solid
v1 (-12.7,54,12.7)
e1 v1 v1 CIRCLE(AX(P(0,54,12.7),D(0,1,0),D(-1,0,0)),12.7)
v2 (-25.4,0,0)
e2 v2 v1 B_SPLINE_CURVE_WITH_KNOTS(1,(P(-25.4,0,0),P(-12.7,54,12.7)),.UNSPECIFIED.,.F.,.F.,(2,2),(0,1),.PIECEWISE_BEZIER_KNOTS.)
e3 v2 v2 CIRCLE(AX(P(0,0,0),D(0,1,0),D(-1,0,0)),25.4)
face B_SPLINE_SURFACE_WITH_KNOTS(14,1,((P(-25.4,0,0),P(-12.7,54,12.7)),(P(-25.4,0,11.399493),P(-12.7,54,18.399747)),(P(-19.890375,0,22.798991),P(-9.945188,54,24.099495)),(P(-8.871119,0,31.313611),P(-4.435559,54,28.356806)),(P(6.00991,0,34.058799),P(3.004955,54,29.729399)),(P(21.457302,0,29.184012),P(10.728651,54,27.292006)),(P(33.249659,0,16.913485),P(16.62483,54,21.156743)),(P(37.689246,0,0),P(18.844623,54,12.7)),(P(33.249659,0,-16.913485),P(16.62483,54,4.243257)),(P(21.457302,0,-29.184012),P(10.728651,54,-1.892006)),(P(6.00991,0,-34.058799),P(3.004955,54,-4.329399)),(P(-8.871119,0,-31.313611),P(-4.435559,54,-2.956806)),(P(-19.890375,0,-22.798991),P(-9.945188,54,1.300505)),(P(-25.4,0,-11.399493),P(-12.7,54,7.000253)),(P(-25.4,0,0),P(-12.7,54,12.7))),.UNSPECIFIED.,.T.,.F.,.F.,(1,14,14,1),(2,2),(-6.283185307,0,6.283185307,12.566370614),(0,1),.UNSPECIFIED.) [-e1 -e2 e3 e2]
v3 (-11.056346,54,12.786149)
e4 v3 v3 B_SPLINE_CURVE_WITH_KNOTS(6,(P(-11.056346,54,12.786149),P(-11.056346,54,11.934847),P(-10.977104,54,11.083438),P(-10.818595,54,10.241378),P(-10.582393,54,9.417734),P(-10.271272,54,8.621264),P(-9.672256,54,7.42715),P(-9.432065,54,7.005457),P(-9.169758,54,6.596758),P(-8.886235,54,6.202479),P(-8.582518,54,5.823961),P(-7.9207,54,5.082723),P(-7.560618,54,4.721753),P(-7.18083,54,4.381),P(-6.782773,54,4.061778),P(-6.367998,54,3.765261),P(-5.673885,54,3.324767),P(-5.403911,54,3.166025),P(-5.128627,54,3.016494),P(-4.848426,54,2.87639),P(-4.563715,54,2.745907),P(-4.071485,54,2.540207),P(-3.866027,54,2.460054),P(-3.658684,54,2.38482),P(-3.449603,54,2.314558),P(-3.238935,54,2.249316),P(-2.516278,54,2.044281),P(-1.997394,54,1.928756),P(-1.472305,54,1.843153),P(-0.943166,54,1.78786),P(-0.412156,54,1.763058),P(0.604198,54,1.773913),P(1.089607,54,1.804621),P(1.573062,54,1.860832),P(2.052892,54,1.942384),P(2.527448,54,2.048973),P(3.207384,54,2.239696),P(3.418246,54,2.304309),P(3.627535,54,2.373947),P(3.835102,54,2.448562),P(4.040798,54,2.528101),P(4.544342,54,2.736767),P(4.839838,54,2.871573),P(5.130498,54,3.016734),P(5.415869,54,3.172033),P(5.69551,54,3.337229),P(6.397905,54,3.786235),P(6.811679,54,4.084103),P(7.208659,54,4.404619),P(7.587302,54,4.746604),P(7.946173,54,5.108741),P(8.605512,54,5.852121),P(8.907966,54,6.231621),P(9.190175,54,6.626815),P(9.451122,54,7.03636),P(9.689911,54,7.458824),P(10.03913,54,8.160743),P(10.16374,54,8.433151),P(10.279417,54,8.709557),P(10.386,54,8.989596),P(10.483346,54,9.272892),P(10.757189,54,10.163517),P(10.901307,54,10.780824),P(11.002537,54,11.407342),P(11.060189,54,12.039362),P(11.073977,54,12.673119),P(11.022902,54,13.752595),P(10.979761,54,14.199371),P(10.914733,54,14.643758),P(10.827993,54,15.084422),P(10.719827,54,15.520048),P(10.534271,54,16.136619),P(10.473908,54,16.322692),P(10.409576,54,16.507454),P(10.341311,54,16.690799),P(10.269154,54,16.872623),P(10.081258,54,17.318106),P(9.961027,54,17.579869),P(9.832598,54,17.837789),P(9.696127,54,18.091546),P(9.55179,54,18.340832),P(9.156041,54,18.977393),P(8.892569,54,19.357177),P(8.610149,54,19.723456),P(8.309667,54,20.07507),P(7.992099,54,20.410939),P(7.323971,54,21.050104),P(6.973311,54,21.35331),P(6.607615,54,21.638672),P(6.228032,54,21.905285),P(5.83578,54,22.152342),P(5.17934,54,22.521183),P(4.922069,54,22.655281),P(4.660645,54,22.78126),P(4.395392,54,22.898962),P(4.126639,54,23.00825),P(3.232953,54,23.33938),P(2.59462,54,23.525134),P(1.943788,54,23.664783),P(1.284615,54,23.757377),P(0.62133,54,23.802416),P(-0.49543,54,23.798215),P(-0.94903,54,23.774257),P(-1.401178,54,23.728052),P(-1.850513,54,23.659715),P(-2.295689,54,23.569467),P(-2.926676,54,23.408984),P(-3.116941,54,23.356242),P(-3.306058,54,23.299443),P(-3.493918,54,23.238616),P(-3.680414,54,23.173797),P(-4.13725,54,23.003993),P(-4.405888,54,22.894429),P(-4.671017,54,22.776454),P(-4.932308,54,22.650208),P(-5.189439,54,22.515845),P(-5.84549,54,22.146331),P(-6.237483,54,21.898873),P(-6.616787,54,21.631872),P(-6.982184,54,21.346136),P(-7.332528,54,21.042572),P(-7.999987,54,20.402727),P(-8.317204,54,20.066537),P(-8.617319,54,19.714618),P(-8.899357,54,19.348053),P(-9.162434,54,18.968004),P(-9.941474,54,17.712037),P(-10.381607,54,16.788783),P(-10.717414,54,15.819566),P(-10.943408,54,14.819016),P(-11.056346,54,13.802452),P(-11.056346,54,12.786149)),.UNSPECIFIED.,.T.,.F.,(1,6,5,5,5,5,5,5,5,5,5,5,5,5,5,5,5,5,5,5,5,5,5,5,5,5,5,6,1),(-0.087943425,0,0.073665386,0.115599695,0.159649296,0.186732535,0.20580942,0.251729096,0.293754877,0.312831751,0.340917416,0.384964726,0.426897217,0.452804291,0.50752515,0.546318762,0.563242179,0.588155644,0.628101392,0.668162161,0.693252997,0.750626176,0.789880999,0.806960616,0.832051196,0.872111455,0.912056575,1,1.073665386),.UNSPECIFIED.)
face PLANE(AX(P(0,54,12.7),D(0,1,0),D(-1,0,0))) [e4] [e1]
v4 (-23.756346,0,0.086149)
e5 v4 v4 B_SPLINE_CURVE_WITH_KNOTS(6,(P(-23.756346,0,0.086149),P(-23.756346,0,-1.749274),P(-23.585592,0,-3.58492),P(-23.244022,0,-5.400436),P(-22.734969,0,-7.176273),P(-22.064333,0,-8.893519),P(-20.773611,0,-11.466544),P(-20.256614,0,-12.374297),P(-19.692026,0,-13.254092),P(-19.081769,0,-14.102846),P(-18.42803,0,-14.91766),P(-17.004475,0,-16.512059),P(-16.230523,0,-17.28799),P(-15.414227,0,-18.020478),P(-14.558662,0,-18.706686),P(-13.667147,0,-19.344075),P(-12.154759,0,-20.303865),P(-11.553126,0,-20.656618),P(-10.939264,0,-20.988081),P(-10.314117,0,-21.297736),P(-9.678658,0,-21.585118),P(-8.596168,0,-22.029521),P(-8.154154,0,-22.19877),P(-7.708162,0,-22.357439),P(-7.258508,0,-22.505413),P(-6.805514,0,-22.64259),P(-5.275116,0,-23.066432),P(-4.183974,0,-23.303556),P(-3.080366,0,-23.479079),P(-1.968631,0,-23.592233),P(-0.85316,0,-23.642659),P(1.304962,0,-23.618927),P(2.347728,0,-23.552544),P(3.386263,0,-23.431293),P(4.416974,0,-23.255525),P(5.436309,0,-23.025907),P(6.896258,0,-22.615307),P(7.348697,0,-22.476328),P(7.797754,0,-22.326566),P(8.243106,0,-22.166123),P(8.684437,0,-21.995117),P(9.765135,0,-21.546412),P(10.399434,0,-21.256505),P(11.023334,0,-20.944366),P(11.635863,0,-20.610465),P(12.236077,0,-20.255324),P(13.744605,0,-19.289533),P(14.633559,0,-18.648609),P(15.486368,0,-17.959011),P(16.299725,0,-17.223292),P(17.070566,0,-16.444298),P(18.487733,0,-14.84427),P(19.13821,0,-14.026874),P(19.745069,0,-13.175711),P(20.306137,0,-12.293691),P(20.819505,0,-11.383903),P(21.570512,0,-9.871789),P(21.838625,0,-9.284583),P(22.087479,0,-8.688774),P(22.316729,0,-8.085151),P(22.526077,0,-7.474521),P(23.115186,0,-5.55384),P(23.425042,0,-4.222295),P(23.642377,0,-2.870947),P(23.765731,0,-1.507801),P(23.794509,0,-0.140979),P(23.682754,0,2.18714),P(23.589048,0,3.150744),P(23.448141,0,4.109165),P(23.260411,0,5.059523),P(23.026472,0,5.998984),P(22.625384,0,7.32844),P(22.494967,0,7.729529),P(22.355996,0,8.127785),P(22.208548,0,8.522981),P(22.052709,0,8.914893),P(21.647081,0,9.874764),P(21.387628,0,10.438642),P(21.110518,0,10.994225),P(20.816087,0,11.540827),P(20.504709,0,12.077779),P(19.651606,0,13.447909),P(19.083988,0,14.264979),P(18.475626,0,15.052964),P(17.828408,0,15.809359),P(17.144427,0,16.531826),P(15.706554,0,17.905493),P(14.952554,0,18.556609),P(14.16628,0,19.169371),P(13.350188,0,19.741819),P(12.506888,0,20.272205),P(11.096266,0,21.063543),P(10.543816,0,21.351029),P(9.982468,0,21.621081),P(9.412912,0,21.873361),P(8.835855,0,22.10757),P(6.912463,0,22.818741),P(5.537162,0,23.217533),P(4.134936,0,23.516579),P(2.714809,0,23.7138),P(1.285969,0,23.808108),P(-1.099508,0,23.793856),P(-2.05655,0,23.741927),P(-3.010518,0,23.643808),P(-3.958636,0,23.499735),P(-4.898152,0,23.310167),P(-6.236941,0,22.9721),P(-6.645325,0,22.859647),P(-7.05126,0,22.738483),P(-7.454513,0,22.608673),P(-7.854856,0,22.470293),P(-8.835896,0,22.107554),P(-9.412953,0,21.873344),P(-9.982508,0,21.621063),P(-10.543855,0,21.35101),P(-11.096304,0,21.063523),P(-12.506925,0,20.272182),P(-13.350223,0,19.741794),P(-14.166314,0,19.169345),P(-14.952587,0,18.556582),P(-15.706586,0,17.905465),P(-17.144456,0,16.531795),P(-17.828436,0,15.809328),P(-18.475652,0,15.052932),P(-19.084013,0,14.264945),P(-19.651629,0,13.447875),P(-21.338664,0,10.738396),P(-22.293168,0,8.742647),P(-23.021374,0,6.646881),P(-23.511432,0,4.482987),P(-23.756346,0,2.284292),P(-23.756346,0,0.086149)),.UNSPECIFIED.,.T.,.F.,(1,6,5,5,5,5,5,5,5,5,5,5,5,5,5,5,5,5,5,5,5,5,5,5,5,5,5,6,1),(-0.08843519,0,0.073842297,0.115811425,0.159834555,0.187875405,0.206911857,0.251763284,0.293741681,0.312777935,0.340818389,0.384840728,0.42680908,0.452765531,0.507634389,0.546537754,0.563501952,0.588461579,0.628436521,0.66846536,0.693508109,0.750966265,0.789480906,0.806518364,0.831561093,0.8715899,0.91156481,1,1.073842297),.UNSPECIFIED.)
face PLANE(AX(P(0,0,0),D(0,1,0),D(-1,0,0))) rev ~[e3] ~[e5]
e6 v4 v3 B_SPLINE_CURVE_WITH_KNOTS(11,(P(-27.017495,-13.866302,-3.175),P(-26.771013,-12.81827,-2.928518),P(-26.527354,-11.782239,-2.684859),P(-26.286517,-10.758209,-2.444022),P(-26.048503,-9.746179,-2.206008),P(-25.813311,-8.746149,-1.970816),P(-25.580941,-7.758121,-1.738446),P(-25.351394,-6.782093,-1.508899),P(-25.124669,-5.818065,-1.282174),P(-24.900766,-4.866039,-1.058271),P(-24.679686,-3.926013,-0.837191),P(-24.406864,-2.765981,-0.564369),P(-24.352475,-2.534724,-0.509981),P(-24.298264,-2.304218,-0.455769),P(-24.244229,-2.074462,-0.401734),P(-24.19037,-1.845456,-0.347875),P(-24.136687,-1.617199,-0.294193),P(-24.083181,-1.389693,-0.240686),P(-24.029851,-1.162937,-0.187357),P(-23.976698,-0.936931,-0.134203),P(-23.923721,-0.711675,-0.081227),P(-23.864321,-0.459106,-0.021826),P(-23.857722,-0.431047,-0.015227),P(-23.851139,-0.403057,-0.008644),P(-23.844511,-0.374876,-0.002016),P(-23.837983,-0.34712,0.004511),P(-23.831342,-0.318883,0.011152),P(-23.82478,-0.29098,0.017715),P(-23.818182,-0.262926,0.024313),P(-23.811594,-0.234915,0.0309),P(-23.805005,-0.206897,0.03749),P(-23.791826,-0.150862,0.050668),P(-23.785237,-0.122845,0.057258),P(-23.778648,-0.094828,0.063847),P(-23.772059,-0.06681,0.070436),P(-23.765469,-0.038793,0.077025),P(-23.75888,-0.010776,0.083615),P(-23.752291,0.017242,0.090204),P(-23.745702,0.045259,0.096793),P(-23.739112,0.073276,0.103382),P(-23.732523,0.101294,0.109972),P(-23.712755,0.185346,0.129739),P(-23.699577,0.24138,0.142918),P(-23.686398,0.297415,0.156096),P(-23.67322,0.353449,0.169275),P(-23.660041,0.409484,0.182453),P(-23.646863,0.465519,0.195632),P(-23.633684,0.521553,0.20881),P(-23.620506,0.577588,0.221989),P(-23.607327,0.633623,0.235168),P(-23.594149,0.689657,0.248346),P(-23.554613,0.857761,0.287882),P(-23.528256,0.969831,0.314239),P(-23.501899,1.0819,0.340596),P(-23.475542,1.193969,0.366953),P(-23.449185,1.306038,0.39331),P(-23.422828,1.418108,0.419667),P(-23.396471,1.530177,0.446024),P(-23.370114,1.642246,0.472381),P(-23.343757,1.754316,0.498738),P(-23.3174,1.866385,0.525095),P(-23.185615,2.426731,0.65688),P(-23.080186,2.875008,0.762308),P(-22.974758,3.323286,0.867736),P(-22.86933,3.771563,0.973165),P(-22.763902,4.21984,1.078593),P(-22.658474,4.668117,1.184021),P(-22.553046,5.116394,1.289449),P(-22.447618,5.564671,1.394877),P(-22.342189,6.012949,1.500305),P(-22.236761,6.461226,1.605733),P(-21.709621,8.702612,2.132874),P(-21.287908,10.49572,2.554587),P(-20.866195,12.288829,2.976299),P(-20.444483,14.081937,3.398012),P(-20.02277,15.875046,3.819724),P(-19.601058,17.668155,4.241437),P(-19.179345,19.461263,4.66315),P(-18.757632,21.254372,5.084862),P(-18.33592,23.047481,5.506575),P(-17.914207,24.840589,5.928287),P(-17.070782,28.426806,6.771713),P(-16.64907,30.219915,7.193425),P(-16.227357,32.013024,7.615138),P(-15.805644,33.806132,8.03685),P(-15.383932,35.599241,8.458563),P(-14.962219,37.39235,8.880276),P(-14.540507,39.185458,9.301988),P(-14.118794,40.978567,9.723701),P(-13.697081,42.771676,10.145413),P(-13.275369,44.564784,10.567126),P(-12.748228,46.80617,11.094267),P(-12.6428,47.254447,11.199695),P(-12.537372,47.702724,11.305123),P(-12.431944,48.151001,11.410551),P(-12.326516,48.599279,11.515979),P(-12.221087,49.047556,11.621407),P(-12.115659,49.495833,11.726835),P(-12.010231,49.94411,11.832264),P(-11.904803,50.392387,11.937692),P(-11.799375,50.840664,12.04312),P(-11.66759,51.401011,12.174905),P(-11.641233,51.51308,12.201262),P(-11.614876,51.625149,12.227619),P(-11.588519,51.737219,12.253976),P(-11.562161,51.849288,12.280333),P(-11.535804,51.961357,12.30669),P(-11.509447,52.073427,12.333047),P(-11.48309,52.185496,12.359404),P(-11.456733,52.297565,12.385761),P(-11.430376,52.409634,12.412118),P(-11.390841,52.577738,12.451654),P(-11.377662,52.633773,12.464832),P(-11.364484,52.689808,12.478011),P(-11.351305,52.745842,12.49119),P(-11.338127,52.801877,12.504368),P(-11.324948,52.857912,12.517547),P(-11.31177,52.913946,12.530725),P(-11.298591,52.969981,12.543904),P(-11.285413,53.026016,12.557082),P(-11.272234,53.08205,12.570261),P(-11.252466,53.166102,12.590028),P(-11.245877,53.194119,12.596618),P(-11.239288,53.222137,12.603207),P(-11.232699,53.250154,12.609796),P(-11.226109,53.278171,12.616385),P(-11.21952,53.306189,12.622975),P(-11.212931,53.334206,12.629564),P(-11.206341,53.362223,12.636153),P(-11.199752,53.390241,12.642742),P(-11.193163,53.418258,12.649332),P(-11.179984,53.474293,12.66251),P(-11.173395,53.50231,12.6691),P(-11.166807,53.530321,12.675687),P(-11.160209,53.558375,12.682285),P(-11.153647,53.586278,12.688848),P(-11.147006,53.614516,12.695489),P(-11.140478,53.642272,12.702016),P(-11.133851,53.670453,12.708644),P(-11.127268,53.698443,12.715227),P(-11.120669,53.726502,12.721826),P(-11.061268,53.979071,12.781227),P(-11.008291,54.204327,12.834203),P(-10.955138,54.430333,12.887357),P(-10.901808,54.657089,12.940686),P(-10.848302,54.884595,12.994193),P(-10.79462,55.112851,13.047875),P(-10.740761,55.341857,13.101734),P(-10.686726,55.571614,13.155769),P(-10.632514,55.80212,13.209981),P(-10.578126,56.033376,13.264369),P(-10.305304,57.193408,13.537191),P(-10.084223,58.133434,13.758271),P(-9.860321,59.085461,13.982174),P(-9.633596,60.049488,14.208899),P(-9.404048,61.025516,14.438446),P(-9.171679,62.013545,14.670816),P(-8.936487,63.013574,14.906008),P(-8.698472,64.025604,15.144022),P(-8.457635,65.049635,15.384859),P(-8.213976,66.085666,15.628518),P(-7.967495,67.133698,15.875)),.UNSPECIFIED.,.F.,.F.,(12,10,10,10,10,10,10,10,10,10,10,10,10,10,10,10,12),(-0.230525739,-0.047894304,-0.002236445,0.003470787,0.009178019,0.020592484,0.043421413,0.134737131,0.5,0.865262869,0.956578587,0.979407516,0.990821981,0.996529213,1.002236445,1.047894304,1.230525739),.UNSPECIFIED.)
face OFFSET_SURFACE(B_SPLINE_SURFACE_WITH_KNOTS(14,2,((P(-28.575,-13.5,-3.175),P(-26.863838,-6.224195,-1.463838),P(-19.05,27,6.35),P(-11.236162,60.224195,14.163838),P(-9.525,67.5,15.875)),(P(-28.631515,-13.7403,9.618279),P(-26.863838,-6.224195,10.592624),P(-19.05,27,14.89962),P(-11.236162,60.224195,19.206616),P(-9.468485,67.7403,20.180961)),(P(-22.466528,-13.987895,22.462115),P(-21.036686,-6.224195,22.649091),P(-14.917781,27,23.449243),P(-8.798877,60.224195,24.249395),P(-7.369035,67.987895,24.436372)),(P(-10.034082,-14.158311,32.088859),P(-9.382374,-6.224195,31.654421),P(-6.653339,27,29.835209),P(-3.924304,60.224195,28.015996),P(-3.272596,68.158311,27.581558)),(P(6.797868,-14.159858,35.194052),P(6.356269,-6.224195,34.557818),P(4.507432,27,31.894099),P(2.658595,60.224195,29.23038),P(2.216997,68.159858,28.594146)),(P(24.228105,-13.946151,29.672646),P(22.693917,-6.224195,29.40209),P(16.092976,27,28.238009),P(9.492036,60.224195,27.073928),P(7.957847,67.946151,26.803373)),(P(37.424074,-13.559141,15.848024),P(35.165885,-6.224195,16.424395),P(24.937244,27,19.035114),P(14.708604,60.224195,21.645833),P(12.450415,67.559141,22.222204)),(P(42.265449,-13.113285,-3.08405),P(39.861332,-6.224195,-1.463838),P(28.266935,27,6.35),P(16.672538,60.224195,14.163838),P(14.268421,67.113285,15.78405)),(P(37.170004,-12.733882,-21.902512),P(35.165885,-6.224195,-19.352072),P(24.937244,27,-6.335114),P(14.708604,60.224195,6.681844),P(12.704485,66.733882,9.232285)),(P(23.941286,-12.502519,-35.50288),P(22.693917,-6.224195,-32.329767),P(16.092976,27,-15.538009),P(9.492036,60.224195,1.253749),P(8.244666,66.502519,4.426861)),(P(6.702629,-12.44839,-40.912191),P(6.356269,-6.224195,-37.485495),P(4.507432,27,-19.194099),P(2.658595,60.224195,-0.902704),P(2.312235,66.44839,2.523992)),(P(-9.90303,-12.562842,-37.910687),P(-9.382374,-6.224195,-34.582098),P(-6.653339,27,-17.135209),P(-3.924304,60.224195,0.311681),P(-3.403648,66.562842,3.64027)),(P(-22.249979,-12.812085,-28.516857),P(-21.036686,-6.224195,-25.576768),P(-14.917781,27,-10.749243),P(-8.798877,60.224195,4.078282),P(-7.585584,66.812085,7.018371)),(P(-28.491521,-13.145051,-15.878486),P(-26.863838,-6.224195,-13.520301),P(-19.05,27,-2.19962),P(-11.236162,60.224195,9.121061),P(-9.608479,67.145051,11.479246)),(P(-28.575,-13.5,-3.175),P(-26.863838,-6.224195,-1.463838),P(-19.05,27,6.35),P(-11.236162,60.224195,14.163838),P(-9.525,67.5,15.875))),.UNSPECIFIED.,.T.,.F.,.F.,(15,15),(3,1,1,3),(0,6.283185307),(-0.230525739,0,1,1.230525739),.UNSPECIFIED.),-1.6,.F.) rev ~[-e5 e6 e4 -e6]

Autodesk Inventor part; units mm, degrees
ref_plane "YZ Plane" through (0, 0, 0) normal (1, 0, 0) x (0, 1, 0)
ref_plane "XY Plane" through (0, 0, 0) normal (0, 0, 1) x (1, 0, 0)
sketch "Szkic6" plane through (0, 0, 0) normal (0, 1, 0) x (-1, 0, 0)
  circle A0 centre (0, 0) radius 25.4
  dimension "d33" = 50.8
ref_plane "Płaszczyzna konstrukcyjna1" through (0, 54, 0) normal (0, 1, 0) x (-1, 0, 0)
sketch "Szkic7" plane through (0, 54, 0) normal (0, 1, 0) x (-1, 0, 0)
  circle A0 centre (0, 12.7) radius 12.7
  line L0 (0, -20.3) -> (0, 20.3) construction
  circle A1 centre (0, 0) radius 25.4 construction
  dimension "d35" = 25.4
loft "Wyciągnięcie złożone1" add profiles "Szkic6", "Szkic7"
shell "Skorupa1" thickness 1.6 removed faces 2 at (-2.0429, 54, 12.1965) at (7.2508, 0, -1.9085)
equation "\"d33\" = OD1"
equation "\"d35\" = OD2"
equation "\"d52\" = THK"
equation "\"SzerokośćGięciaPodcięcia\" = Grubość"
equation "\"RozmiarPodcięciaNarożnika\" = 4 * Grubość"
equation "\"PromieńPrzejścia\" = PromieńGięcia"
equation "\"Rozmiar_promienia_Jacobiego\" = PromieńGięcia"
equation "\"Wielk_odstępu\" = Grubość"
equation "\"d2\" = PromieńGięcia"
equation "\"d23\" = PromieńGięcia"
equation "\"OD1\" = 50.8"
equation "\"OD2\" = 25.4"
equation "\"L\" = 54"
equation "\"THK\" = 1.6"
equation "\"d34\" = L"
equation "\"Grubość\" = 1.5"
equation "\"PromieńGięcia\" = 3"
properties part number "Redukcja asymetryczna Ø50,8x25,4x1,6 L=54" material "304"
